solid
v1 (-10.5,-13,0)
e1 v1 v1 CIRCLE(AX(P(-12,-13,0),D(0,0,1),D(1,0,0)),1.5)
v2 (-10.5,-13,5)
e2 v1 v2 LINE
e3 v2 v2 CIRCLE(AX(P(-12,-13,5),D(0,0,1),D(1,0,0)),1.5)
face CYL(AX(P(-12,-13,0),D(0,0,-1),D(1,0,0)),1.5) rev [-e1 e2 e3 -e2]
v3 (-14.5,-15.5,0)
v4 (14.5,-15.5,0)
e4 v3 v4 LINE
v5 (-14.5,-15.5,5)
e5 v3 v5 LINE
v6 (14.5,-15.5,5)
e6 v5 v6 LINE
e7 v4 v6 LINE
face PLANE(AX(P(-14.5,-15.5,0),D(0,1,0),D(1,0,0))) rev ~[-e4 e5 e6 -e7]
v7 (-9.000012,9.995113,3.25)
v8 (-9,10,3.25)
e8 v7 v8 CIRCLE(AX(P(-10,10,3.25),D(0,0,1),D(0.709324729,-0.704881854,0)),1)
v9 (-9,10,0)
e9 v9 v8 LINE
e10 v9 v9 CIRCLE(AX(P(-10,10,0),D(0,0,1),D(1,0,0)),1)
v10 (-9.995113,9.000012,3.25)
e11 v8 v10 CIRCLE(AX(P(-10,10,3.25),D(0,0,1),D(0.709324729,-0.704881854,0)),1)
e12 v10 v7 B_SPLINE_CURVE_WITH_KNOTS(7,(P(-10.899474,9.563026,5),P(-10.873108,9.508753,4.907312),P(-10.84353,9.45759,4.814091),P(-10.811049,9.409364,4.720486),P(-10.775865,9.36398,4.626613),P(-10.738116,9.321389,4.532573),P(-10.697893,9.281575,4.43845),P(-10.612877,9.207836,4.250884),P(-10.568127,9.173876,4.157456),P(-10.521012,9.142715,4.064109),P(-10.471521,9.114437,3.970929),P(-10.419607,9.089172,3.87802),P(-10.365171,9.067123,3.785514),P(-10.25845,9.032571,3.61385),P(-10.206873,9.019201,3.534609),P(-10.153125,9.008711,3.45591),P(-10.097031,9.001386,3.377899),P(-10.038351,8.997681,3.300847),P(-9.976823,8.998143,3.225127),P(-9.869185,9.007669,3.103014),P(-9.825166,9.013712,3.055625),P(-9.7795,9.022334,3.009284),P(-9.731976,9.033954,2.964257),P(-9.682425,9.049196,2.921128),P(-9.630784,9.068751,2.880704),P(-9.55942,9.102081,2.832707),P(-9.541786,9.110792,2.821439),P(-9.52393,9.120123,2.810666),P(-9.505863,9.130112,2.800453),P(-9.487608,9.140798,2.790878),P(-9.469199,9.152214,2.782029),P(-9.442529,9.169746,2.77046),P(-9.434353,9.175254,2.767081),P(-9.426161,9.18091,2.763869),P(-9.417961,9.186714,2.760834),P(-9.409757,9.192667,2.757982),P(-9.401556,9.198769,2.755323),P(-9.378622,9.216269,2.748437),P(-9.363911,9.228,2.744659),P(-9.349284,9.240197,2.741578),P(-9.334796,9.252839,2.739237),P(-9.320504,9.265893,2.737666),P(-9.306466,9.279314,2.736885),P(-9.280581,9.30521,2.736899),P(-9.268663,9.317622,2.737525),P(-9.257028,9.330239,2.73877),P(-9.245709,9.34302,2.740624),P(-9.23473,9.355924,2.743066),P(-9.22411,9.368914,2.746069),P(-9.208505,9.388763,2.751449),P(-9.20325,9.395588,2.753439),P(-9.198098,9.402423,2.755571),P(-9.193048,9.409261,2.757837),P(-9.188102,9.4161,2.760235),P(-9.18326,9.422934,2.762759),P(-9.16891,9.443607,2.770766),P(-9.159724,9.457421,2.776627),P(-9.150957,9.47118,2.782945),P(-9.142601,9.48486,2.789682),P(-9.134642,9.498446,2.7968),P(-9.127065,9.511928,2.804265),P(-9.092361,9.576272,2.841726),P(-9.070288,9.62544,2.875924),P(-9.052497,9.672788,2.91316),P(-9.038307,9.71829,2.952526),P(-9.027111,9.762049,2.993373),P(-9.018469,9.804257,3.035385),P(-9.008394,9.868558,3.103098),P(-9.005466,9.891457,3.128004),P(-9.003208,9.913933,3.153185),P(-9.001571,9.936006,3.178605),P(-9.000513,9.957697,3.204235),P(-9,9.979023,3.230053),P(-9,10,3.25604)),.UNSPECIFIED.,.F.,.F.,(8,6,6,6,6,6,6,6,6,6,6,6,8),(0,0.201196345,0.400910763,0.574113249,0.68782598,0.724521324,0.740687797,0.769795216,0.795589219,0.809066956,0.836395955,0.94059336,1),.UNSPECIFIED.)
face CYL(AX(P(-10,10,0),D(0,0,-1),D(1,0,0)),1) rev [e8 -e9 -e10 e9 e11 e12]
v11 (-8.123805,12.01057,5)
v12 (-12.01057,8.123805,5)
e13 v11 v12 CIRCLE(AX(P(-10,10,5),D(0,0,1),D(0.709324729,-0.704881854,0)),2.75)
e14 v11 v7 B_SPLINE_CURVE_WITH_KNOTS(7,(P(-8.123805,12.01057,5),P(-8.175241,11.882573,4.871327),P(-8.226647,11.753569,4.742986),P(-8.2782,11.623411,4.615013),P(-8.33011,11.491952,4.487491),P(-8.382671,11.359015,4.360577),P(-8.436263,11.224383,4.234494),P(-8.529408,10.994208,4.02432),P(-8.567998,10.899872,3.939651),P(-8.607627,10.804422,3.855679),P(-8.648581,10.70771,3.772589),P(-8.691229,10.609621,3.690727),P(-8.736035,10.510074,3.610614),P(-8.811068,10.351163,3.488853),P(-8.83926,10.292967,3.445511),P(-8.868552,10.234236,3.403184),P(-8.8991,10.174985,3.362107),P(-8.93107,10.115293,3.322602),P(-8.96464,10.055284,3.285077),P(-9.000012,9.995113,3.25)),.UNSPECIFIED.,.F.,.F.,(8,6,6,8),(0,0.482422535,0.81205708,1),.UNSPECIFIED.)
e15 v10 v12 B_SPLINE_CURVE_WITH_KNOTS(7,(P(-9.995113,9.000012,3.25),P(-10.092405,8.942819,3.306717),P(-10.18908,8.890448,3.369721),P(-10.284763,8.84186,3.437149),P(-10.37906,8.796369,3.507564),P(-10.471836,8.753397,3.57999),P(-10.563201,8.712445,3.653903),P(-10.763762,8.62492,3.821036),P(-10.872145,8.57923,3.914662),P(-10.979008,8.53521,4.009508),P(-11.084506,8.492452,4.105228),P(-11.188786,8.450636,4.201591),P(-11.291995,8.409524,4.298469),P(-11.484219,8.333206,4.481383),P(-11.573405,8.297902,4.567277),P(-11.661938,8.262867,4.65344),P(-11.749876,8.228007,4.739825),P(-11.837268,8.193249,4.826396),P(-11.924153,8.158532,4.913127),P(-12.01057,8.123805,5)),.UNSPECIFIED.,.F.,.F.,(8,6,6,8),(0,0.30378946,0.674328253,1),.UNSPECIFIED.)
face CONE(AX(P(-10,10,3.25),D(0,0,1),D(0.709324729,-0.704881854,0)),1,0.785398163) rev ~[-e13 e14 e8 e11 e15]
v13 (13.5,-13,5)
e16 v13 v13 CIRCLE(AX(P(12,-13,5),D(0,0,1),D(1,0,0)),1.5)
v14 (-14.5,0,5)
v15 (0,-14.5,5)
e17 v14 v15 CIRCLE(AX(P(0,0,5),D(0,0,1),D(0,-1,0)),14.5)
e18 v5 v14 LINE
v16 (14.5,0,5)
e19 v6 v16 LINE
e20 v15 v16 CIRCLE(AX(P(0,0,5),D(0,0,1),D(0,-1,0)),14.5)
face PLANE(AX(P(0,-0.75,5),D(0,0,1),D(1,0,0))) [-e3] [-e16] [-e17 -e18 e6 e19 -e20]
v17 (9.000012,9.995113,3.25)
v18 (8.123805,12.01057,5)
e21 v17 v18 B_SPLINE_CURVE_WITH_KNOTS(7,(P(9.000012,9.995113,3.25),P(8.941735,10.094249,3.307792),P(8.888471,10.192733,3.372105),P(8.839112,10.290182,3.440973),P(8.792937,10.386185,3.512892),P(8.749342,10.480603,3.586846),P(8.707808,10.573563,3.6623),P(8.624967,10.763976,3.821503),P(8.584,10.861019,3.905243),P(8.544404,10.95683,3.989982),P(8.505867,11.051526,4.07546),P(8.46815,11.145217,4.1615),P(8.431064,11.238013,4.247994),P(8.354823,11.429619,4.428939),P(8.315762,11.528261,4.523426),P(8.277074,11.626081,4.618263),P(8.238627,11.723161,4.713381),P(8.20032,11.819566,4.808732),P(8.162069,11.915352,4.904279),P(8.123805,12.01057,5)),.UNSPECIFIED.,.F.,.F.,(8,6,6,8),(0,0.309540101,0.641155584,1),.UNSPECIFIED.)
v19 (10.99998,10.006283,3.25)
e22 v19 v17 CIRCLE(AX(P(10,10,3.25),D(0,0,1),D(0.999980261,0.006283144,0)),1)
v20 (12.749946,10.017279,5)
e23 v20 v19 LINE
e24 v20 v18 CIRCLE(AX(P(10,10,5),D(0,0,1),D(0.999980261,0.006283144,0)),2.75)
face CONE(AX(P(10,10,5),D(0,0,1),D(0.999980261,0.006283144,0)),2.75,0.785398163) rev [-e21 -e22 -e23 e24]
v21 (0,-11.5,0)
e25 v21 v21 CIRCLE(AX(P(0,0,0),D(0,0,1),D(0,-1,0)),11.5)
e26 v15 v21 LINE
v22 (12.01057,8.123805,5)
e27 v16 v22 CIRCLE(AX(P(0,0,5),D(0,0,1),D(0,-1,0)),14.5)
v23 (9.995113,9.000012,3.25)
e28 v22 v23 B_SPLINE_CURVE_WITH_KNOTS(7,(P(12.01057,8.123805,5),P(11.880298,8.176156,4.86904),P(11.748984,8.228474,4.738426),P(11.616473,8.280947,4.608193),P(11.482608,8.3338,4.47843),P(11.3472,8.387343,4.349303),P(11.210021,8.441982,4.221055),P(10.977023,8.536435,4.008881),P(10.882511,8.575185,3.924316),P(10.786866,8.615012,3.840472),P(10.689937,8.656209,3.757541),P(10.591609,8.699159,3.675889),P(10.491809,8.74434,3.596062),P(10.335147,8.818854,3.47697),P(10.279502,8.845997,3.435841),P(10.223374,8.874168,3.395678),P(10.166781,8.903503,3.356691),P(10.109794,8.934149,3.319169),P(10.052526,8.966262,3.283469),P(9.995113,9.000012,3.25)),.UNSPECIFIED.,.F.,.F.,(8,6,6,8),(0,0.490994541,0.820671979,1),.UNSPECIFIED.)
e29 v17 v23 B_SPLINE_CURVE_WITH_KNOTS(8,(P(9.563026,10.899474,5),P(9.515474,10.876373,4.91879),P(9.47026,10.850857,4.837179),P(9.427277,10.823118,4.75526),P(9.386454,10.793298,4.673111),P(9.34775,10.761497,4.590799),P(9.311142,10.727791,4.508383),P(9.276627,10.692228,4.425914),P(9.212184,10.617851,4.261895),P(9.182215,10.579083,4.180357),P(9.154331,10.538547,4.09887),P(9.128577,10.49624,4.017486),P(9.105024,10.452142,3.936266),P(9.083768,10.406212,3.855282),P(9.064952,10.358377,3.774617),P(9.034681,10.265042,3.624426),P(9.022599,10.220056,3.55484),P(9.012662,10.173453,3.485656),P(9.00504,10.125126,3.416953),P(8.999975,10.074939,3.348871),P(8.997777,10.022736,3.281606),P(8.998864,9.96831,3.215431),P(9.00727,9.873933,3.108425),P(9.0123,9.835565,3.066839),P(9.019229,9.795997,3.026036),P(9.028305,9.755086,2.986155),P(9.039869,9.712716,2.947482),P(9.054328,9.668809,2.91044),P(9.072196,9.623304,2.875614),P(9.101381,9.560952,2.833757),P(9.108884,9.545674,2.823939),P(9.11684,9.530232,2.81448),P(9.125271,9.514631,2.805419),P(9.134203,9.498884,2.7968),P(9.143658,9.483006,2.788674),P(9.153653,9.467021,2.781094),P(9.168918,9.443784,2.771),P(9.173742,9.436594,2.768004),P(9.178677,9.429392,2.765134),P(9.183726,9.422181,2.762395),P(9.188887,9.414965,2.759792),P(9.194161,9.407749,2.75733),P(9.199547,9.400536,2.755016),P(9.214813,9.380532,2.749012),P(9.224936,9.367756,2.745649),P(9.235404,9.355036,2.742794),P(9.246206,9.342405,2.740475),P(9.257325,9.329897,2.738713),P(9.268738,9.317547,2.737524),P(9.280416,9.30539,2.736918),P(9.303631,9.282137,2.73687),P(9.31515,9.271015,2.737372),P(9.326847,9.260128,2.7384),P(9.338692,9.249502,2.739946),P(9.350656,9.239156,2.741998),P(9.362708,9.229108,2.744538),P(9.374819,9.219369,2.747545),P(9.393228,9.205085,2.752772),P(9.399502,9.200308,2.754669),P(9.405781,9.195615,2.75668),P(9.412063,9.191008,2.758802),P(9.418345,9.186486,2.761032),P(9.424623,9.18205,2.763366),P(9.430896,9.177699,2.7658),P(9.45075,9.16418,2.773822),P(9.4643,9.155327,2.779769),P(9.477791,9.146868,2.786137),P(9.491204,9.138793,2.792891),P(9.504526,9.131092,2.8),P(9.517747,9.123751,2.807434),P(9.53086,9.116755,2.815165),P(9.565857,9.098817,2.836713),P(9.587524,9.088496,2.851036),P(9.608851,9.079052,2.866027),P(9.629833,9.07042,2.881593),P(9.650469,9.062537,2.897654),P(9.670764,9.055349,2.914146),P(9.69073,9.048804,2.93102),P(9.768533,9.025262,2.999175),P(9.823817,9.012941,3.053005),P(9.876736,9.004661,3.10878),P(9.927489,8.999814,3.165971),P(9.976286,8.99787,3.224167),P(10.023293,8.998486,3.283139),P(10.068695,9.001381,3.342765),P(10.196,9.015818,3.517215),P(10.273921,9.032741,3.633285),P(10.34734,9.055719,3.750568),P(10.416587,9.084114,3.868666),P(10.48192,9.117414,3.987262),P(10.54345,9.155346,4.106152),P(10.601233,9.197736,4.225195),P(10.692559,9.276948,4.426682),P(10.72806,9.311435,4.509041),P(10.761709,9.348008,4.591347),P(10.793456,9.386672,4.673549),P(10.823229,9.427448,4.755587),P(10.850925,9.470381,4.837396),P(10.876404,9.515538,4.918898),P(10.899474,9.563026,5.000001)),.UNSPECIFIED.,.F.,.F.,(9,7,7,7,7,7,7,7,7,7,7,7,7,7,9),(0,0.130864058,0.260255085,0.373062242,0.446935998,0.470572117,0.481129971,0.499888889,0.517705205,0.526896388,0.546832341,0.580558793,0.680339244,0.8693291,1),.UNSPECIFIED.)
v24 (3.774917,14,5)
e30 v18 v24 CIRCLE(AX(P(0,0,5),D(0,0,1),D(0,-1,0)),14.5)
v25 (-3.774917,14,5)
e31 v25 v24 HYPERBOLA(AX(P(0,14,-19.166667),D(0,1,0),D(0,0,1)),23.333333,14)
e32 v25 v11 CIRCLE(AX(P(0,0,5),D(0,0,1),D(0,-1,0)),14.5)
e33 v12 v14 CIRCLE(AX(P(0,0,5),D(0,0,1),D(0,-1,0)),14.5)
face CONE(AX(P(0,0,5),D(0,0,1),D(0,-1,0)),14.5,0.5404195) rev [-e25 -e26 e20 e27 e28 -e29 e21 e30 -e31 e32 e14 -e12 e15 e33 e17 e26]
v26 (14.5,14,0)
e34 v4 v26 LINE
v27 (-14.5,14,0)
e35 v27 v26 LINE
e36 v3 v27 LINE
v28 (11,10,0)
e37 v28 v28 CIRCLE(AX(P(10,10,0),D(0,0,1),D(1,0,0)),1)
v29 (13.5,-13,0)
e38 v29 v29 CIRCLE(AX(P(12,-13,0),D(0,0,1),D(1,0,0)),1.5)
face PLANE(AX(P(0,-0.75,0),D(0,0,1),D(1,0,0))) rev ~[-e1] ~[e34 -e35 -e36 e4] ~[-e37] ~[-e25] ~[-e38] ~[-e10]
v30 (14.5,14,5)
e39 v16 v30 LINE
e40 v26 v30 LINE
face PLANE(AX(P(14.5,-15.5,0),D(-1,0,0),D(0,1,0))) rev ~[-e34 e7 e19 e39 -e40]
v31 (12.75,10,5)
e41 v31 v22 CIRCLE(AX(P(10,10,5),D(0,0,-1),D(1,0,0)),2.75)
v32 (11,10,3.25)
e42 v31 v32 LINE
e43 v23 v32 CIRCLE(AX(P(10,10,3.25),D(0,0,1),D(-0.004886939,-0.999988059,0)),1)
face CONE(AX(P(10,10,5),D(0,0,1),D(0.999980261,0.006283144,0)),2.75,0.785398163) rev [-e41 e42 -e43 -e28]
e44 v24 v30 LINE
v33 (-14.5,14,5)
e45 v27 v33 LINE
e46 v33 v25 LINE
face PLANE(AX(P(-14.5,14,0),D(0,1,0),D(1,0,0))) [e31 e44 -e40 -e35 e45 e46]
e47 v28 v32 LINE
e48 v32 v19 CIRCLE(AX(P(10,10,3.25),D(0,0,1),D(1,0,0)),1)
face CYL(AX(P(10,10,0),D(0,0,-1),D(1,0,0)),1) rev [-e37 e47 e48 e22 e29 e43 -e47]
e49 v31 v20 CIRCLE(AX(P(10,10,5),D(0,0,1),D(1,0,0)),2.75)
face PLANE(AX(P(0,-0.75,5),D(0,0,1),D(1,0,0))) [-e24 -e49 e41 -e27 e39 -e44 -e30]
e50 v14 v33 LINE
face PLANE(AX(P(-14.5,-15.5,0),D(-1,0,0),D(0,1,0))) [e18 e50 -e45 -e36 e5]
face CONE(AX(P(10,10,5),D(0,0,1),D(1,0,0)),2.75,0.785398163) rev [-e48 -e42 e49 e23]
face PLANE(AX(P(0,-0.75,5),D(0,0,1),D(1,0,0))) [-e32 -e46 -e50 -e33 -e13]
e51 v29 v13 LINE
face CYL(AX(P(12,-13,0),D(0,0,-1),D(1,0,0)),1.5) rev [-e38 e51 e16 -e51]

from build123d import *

# Parameters (mm, degrees)
F0_W        = 29
F0_H        = 29.5
F0_R        = 1.5
F0_R_2      = 1
F0_R_3      = 11.5
F1_DEPTH    = 5
F4_T2_ANGLE = 359.64
F4_T4_ANGLE = 359.64
F4_T6_ANGLE = 359.64


# Not quite as in the source:
# - a fillet or chamfer that OpenCascade refuses, or shapes differently, is made with other operations: its cross-section is extruded or revolved along the edge and cut away or added


with BuildPart() as f1:
    # F0 (on Top) → F1 (new body)
    with BuildSketch(Plane.XY):
        with Locations((0, -0.75)):
            Rectangle(F0_W, F0_H)
        with Locations((-12, -13)):
            Circle(F0_R, mode=Mode.SUBTRACT)
        with Locations((12, -13)):
            Circle(F0_R, mode=Mode.SUBTRACT)
        with Locations((-10, 10)):
            Circle(F0_R_2, mode=Mode.SUBTRACT)
        Circle(F0_R_3, mode=Mode.SUBTRACT)
        with Locations((10, 10)):
            Circle(F0_R_2, mode=Mode.SUBTRACT)
    extrude(amount=F1_DEPTH)

    # F2 (on Right) → F3 (revolve, cut)
    with BuildSketch(Plane.YZ):
        Polygon((-14.5, 5), (-11.5, 0), (-11.5, 5), align=None)
    revolve(axis=Axis((0, 0, 6.3592060469), (0, 0, 1)), mode=Mode.SUBTRACT)

    # F4: chamfer of 1.75 on 3 edges, made by hand

    # F4_s1 → F4_t2 (revolve, cut)
    with BuildSketch(Plane(origin=(0.0313170241, 0.0315144155, 0), x_dir=(0, 0, 1), z_dir=(-0.7048818539, -0.7093247296, 0))):
        Polygon((3.25, 13.1420658351), (5, 11.3920658351), (5, 13.1420658351), align=None)
    revolve(axis=Axis((-10, 10, 5), (0, 0, 1)), revolution_arc=F4_T2_ANGLE, mode=Mode.SUBTRACT)

    # F4_s3 → F4_t4 (revolve, cut)
    with BuildSketch(Plane(origin=(-0.0624354204, 9.9367750216, 0), x_dir=(0, 0, 1), z_dir=(0.006283144, -0.9999802609, 0))):
        Polygon((5, -12.8126340482), (3.25, -11.0626340482), (5, -11.0626340482), align=None)
    revolve(axis=Axis((10, 10, 5), (0, 0, 1)), revolution_arc=F4_T4_ANGLE, mode=Mode.SUBTRACT)

    # F4_s5 → F4_t6 (revolve, cut)
    with BuildSketch(Plane.XZ.offset(-10)):
        Polygon((12.75, 5), (11, 3.25), (11, 5), align=None)
    revolve(axis=Axis((10, 10, 5), (0, 0, 1)), revolution_arc=F4_T6_ANGLE, mode=Mode.SUBTRACT)


solid = f1.part
